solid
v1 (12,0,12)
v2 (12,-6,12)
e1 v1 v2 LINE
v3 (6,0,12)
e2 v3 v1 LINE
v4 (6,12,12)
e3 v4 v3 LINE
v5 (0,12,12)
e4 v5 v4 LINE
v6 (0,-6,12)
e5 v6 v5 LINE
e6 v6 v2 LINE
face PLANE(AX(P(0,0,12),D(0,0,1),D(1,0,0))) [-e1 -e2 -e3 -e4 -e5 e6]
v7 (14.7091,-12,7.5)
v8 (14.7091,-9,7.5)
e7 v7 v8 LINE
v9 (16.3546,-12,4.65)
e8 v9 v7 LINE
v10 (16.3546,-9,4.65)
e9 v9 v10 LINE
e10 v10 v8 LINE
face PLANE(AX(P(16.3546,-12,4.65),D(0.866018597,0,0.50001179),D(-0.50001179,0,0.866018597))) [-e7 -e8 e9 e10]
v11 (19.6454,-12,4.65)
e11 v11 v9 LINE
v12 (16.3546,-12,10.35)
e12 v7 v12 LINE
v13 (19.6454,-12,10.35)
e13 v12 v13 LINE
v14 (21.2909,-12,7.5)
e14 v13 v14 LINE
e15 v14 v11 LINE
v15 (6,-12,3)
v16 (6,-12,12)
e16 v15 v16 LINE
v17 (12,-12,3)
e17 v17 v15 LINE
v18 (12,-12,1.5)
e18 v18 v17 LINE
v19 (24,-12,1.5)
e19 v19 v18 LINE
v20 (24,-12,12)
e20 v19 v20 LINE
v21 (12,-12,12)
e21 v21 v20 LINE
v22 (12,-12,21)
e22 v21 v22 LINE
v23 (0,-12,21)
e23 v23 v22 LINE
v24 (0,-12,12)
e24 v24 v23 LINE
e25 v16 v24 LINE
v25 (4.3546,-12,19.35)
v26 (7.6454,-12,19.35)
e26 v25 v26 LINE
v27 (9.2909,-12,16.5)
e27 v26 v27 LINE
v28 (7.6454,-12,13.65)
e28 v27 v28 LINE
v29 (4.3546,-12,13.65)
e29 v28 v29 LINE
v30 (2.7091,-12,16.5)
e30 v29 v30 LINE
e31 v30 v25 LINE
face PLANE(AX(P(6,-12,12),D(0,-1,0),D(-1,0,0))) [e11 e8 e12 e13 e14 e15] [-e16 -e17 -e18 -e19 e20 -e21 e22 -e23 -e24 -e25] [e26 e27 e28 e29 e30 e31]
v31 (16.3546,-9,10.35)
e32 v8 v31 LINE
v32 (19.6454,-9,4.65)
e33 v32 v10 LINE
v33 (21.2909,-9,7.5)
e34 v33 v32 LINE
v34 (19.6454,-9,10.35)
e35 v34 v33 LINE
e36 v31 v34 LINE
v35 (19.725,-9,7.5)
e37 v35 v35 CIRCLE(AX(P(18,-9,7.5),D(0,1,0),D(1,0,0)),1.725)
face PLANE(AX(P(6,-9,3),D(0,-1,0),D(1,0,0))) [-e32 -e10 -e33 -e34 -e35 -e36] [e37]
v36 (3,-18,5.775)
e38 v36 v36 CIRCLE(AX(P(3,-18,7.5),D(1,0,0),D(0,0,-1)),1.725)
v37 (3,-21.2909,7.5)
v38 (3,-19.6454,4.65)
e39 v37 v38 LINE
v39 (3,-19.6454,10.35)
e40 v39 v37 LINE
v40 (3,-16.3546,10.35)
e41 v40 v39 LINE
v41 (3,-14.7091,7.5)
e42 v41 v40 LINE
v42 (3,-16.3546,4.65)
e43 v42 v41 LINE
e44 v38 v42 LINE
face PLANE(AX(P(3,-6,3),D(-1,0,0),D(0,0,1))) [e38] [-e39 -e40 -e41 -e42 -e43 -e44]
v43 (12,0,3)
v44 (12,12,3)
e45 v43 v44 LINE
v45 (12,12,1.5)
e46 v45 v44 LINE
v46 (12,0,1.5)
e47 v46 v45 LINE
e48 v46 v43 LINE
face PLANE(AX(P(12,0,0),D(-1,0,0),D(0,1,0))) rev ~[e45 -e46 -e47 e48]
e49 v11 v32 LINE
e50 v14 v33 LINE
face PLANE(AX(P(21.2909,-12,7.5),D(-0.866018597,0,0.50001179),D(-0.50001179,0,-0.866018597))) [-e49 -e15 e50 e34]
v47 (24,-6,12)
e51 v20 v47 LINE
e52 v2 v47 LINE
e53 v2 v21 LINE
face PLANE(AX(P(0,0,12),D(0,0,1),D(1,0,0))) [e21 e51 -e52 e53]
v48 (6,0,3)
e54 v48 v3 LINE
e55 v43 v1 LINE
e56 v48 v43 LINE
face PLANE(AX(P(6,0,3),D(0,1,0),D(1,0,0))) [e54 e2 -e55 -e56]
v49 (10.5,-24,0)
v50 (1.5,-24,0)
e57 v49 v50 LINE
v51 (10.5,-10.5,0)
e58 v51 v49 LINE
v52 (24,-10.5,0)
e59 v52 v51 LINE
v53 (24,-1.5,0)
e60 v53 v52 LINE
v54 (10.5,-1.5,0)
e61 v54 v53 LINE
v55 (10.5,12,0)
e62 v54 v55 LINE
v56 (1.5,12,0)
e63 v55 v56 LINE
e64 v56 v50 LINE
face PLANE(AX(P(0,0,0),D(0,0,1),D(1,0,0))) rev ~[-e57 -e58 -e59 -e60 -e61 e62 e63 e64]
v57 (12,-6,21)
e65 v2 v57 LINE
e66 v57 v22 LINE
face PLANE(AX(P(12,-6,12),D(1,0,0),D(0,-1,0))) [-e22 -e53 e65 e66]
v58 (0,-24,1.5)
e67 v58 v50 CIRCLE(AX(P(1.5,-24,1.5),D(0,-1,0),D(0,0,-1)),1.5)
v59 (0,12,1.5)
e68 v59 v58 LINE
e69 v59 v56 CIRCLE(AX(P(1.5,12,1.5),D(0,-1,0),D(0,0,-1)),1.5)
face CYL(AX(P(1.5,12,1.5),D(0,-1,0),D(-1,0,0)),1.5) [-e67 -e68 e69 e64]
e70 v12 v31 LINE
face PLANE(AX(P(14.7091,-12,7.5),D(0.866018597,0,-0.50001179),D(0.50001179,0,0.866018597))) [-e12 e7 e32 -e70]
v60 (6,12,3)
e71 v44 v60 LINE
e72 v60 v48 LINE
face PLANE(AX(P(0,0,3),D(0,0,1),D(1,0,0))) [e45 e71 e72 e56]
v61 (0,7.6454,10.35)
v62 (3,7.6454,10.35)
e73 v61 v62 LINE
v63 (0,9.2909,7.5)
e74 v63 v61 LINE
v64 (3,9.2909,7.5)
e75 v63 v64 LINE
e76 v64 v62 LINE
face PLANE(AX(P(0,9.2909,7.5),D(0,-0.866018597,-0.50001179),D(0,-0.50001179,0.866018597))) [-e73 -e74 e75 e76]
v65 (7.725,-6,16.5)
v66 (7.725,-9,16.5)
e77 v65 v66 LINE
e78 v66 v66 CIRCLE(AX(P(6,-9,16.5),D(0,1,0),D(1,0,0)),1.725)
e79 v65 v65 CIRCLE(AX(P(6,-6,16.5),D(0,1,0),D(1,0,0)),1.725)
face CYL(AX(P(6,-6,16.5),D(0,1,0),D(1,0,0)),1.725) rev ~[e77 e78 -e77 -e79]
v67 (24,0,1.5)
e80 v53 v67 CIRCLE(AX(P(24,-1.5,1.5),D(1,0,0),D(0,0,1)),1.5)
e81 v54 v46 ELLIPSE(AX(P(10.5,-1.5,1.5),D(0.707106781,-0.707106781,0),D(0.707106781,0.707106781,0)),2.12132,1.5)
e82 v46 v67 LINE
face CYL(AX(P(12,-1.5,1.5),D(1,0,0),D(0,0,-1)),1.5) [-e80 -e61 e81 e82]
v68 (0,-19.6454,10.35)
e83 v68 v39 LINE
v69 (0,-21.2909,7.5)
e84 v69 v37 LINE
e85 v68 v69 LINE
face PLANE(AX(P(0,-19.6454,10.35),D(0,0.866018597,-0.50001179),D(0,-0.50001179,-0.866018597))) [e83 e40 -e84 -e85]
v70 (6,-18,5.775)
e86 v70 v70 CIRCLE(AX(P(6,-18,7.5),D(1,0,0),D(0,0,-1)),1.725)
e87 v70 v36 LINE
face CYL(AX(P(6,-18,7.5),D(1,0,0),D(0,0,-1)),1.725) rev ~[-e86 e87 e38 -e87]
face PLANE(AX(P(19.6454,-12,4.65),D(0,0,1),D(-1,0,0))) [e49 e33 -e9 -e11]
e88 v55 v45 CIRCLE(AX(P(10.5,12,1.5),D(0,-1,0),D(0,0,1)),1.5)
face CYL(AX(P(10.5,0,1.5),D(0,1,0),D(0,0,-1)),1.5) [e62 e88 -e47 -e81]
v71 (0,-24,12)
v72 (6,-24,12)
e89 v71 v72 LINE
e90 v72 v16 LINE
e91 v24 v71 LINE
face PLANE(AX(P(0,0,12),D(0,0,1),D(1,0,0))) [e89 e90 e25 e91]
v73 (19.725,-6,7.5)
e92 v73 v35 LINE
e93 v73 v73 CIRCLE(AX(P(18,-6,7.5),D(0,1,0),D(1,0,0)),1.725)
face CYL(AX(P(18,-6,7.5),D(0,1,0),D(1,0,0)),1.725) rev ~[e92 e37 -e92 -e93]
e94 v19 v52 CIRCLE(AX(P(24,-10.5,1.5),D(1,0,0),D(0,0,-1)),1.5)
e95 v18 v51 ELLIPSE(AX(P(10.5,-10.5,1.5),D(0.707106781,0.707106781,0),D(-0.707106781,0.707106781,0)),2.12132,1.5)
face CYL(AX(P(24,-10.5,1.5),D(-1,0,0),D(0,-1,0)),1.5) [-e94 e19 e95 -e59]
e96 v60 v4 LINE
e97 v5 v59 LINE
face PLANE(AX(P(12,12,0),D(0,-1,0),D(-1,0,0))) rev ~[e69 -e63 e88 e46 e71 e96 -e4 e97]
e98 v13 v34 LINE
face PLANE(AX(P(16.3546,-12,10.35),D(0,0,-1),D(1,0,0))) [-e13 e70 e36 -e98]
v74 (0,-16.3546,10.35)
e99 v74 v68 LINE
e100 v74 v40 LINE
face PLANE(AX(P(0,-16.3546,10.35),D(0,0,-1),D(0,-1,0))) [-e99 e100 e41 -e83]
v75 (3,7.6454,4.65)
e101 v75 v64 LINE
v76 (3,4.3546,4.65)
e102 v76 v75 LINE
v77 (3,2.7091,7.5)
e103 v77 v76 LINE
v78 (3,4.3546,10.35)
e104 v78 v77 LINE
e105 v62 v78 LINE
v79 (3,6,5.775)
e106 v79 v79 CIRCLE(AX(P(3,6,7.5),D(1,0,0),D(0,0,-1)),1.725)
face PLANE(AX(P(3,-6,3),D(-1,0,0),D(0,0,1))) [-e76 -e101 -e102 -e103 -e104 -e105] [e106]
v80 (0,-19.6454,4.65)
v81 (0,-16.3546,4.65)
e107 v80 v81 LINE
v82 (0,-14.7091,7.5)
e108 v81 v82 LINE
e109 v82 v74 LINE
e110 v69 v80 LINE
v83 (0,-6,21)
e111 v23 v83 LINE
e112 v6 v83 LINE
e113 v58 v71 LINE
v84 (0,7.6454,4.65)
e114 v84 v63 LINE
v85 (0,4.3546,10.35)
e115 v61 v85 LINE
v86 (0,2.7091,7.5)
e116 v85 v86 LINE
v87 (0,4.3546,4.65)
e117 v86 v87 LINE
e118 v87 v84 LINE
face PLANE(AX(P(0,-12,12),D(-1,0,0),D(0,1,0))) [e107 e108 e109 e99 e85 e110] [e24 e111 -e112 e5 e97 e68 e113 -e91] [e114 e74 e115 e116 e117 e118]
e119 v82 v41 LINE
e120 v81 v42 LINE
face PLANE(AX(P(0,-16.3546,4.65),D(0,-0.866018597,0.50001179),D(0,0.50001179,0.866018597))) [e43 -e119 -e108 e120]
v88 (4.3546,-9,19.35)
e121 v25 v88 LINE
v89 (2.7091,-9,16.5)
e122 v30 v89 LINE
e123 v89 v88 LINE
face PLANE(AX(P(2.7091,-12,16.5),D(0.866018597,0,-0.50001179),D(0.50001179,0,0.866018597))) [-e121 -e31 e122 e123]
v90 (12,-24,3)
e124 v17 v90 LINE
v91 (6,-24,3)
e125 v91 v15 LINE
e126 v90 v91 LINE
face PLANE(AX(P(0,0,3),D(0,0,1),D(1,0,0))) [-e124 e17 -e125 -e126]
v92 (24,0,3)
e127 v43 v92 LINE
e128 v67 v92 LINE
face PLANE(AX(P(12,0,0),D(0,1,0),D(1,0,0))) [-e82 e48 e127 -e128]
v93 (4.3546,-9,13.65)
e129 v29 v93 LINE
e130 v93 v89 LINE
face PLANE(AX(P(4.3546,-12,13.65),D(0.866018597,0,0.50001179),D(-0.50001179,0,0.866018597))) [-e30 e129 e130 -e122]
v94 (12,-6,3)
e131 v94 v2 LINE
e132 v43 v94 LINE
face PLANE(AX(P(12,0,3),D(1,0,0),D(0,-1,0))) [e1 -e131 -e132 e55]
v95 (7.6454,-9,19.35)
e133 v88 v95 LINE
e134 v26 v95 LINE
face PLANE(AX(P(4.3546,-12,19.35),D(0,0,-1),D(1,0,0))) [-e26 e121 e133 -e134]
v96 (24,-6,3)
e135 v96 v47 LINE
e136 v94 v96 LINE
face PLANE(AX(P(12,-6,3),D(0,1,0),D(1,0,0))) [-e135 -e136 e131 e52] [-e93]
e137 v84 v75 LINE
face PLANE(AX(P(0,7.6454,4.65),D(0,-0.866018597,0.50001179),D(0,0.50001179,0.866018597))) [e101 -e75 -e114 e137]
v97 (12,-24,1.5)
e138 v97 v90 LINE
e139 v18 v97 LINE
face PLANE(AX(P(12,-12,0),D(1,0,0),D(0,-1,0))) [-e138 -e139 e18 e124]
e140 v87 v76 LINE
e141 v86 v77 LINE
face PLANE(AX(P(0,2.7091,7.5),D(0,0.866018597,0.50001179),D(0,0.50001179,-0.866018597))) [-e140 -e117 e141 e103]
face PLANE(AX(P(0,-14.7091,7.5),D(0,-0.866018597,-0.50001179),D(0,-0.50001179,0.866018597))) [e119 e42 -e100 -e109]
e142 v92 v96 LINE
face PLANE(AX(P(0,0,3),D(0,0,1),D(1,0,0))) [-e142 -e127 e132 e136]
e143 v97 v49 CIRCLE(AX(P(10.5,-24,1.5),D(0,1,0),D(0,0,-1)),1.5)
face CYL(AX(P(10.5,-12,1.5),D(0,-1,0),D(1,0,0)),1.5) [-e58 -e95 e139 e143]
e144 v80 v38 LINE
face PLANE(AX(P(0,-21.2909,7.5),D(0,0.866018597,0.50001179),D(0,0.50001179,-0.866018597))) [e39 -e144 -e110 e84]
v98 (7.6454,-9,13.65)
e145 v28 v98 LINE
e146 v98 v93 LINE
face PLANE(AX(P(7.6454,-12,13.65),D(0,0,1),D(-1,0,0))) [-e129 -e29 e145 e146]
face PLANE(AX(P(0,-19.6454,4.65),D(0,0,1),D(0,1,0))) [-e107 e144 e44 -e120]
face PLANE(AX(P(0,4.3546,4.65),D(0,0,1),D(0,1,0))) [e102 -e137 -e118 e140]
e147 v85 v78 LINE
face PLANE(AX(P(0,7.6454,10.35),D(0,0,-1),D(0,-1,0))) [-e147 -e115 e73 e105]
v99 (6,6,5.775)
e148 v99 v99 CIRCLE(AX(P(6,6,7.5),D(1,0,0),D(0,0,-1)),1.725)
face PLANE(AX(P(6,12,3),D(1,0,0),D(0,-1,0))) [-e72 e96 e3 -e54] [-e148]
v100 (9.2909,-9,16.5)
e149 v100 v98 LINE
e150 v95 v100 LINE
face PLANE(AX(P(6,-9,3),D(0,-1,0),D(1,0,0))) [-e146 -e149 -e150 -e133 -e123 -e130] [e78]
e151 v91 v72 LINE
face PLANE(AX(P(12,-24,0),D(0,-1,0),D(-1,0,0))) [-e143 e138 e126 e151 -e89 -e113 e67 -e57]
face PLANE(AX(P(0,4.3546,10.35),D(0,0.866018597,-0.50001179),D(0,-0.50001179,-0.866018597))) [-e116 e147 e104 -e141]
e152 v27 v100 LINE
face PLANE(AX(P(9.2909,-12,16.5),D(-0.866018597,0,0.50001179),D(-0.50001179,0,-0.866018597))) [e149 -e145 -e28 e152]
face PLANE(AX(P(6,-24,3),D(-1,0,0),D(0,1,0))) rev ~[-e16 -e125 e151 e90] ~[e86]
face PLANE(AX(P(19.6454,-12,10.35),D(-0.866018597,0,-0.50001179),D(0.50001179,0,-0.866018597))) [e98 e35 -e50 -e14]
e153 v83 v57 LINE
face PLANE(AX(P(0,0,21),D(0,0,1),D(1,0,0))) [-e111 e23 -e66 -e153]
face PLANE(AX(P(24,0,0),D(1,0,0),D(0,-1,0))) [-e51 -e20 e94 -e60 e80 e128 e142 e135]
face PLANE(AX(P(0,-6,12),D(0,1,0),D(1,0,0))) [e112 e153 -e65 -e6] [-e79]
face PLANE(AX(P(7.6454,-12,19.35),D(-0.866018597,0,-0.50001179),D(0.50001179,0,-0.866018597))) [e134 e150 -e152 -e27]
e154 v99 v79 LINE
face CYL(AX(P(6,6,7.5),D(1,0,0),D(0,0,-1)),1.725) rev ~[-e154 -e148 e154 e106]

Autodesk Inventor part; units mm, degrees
ref_plane "YZ Plane" through (0, 0, 0) normal (1, 0, 0) x (0, 1, 0)
ref_plane "XZ Plane" through (0, 0, 0) normal (0, 1, 0) x (-1, 0, 0)
ref_plane "XY Plane" through (0, 0, 0) normal (0, 0, 1) x (1, 0, 0)
sketch "Sketch1" plane through (0, 0, 0) normal (0, 0, 1) x (1, 0, 0)
  line L0 (0, 0) -> (12, 0)
  line L1 (12, 0) -> (12, 12)
  line L2 (12, 12) -> (0, 12)
  line L3 (0, 12) -> (0, 0)
  line L4 (12, 0) -> (0, 0)
  line L5 (0, 0) -> (0, -12)
  line L6 (0, -12) -> (12, -12)
  line L7 (12, -12) -> (12, 0)
  line L8 (12, 0) -> (24, 0)
  line L9 (24, 0) -> (24, -12)
  line L10 (24, -12) -> (12, -12)
  line L11 (12, -12) -> (12, 0)
  line L12 (0, -12) -> (-12, -12)
  line L13 (-12, -12) -> (-12, 0)
  line L14 (-12, 0) -> (0, 0)
  line L15 (0, 0) -> (0, -12)
  line L16 (0, -12) -> (12, -12)
  line L17 (12, -12) -> (12, -24)
  line L18 (12, -24) -> (0, -24)
  line L19 (0, -24) -> (0, -12)
  dimension "d0" = 12
  dimension "d1" = 12
  dimension "d2" = 12
  dimension "d3" = 12
  dimension "d4" = 12
  dimension "d5" = 12
  dimension "d6" = 12
  dimension "d7" = 12
  dimension "d8" = 12
  dimension "d9" = 12
extrude "Extrusion1" add sketch "Sketch1" along normal blind 3
sketch "Sketch2" plane through (0, 0, 3) normal (0, 0, 1) x (1, 0, 0)
  line L0 (-12, 0) -> (-12, -12) projected
  line L1 (-12, -12) -> (-12, -6)
  line L2 (-12, -6) -> (0, -6)
  line L3 (-12, -12) -> (0, -12) projected
  line L4 (0, -6) -> (0, -12)
  line L5 (0, -12) -> (-12, -12)
  line L6 (12, -24) -> (12, -12) projected
  line L7 (12, -12) -> (12, -6)
  line L8 (12, -6) -> (24, -6)
  line L9 (24, -12) -> (24, 0) projected
  line L10 (12, -12) -> (24, -12) projected
  line L11 (24, -6) -> (24, -12)
  line L12 (24, -12) -> (12, -12)
  line L13 (0, 0) -> (0, -6)
  line L14 (12, 0) -> (12, 12) projected
  line L15 (0, 0) -> (12, 0)
  line L16 (12, 0) -> (12, -6)
  line L17 (12, -12) -> (0, -12)
  line L18 (0, 12) -> (0, 0) projected
  line L19 (0, 0) -> (0, 12)
  line L20 (0, 12) -> (6, 12)
  line L21 (12, 12) -> (0, 12) projected
  line L22 (6, 12) -> (6, 0)
  line L23 (6, 0) -> (0, 0)
  line L24 (0, -12) -> (0, -24) projected
  line L25 (0, -12) -> (0, -24)
  line L26 (0, -24) -> (6, -24)
  line L27 (0, -24) -> (12, -24) projected
  line L28 (6, -24) -> (6, -12)
  line L29 (6, -12) -> (0, -12)
  dimension "d12" = 6
  dimension "d13" = 12
extrude "Extrusion2" add sketch "Sketch2" along normal blind 9 contours L2 L4 L3 L0 | L13 L15 L16 L7 L17 L4 | L17 L28 L26 L24 | L18 L20 L22 L15 | L7 L8 L9 L10
sketch "Sketch3" plane through (0, 0, 12) normal (0, 0, 1) x (1, 0, 0)
  line L0 (0, -6) -> (12, -6)
  line L1 (12, -12) -> (6, -12) projected
  line L2 (12, -6) -> (12, -12)
  line L3 (0, -12) -> (0, -24) projected
  line L4 (12, -12) -> (0, -12)
  line L5 (0, -12) -> (0, -6)
  point P0 (0, 0)
extrude "Extrusion3" add sketch "Sketch3" along normal blind 9
sketch "Sketch4" plane through (6, -12, 3) normal (0, -1, 0) x (1, 0, 0)
  point P0 (-6, -3)
sketch "Sketch5" plane through (-12, -6, 3) normal (0, 1, 0) x (1, 0, 0)
  circle A0 centre (6, -4.5) radius 1.725
  line L0 (0, 0) -> (0, -9) projected
  line L1 (12, -9) -> (0, -9) projected
  circle A1 centre (18, -13.5) radius 1.725
  line L2 (24, -18) -> (12, -18) projected
  line L3 (24, -9) -> (24, -18) projected
  circle A2 centre (30, -4.5) radius 1.725
  line L4 (36, 0) -> (36, -9) projected
  line L5 (36, -9) -> (24, -9) projected
  point P0 (12, 3)
  dimension "d19" = 3.45
  dimension "d20" = 6
  dimension "d21" = 4.5
  dimension "d22" = 3.45
  dimension "d23" = 4.5
  dimension "d24" = 6
  dimension "d25" = 3.45
  dimension "d26" = 6
  dimension "d27" = 4.5
extrude "Extrusion4" cut sketch "Sketch5" against normal blind 3
sketch "Sketch6" plane through (6, -12, 3) normal (0, -1, 0) x (1, 0, 0)
  circle A0 centre (-12, 4.5) radius 1.725 projected
  line L0 (-10.3546, 7.35) -> (-8.7091, 4.5)
  line L1 (-8.7091, 4.5) -> (-10.3546, 1.65)
  line L2 (-10.3546, 1.65) -> (-13.6454, 1.65)
  line L3 (-13.6454, 1.65) -> (-15.2909, 4.5)
  line L4 (-15.2909, 4.5) -> (-13.6454, 7.35)
  line L5 (-13.6454, 7.35) -> (-10.3546, 7.35)
  circle A1 centre (12, 4.5) radius 1.725 projected
  line L6 (13.6454, 7.35) -> (15.2909, 4.5)
  line L7 (15.2909, 4.5) -> (13.6454, 1.65)
  line L8 (13.6454, 1.65) -> (10.3546, 1.65)
  line L9 (10.3546, 1.65) -> (8.7091, 4.5)
  line L10 (8.7091, 4.5) -> (10.3546, 7.35)
  line L11 (10.3546, 7.35) -> (13.6454, 7.35)
  circle A2 centre (0, 13.5) radius 1.725 projected
  line L12 (1.6454, 16.35) -> (3.2909, 13.5)
  line L13 (3.2909, 13.5) -> (1.6454, 10.65)
  line L14 (1.6454, 10.65) -> (-1.6454, 10.65)
  line L15 (-1.6454, 10.65) -> (-3.2909, 13.5)
  line L16 (-3.2909, 13.5) -> (-1.6454, 16.35)
  line L17 (-1.6454, 16.35) -> (1.6454, 16.35)
  point P0 (-6, -3)
  dimension "d30" = 2.85
  dimension "d31" = 2.85
  dimension "d32" = 2.85
extrude "Extrusion5" cut sketch "Sketch6" against normal blind 3 contours A0 | L0 L1 L2 L3 L4 L5 | A1 | L6 L7 L8 L9 L10 L11 | A2 | L12 L13 L14 L15 L16 L17
sketch "Sketch7" plane through (6, 0, 3) normal (1, 0, 0) x (0, 0, -1)
  circle A0 centre (-4.5, 6) radius 1.725
  circle A1 centre (-4.5, -18) radius 1.725
  line L0 (-9, 0) -> (-9, 12) projected
  line L1 (-9, -24) -> (-9, -12) projected
  line L2 (0, -24) -> (-9, -24) projected
  line L3 (0, 12) -> (-9, 12) projected
  point P0 (3, 0)
  dimension "d35" = 3.45
  dimension "d36" = 3.45
  dimension "d37" = 4.5
  dimension "d38" = 4.5
  dimension "d39" = 6
  dimension "d40" = 6
extrude "Extrusion6" cut sketch "Sketch7" against normal blind 3
sketch "Sketch8" plane through (0, -6, 3) normal (-1, 0, 0) x (0, 0, 1)
  circle A0 centre (4.5, 12) radius 1.725 projected
  line L0 (1.65, 13.6454) -> (4.5, 15.2909)
  line L1 (4.5, 15.2909) -> (7.35, 13.6454)
  line L2 (7.35, 13.6454) -> (7.35, 10.3546)
  line L3 (7.35, 10.3546) -> (4.5, 8.7091)
  line L4 (4.5, 8.7091) -> (1.65, 10.3546)
  line L5 (1.65, 10.3546) -> (1.65, 13.6454)
  circle A1 centre (4.5, -12) radius 1.725 projected
  line L6 (1.65, -10.3546) -> (4.5, -8.7091)
  line L7 (4.5, -8.7091) -> (7.35, -10.3546)
  line L8 (7.35, -10.3546) -> (7.35, -13.6454)
  line L9 (7.35, -13.6454) -> (4.5, -15.2909)
  line L10 (4.5, -15.2909) -> (1.65, -13.6454)
  line L11 (1.65, -13.6454) -> (1.65, -10.3546)
  point P0 (-3, 6)
  dimension "d43" = 2.85
  dimension "d44" = 2.85
extrude "Extrusion7" cut sketch "Sketch8" against normal blind 3 contours A0 | L0 L1 L2 L3 L4 L5 | A1 | L6 L7 L8 L9 L10 L11
sketch "Sketch9" plane through (0, 0, 0) normal (0, 0, -1) x (-1, 0, 0)
  line L0 (0, 0) -> (12, 0) projected
  line L1 (12, 0) -> (12, -12) projected
  line L2 (0, 0) -> (12, 0)
  line L3 (12, 0) -> (12, -12)
  line L4 (12, -12) -> (0, -12)
  line L5 (0, -12) -> (0, 0)
extrude "Extrusion8" cut sketch "Sketch9" against normal through all
fillet "Fillet2" radius 1.5 5 edges at (18, 0, 0) (12, 6, 0) (18, -12, 0) (12, -18, 0) (0, -6, 0)
properties part number "threewayNSW"
